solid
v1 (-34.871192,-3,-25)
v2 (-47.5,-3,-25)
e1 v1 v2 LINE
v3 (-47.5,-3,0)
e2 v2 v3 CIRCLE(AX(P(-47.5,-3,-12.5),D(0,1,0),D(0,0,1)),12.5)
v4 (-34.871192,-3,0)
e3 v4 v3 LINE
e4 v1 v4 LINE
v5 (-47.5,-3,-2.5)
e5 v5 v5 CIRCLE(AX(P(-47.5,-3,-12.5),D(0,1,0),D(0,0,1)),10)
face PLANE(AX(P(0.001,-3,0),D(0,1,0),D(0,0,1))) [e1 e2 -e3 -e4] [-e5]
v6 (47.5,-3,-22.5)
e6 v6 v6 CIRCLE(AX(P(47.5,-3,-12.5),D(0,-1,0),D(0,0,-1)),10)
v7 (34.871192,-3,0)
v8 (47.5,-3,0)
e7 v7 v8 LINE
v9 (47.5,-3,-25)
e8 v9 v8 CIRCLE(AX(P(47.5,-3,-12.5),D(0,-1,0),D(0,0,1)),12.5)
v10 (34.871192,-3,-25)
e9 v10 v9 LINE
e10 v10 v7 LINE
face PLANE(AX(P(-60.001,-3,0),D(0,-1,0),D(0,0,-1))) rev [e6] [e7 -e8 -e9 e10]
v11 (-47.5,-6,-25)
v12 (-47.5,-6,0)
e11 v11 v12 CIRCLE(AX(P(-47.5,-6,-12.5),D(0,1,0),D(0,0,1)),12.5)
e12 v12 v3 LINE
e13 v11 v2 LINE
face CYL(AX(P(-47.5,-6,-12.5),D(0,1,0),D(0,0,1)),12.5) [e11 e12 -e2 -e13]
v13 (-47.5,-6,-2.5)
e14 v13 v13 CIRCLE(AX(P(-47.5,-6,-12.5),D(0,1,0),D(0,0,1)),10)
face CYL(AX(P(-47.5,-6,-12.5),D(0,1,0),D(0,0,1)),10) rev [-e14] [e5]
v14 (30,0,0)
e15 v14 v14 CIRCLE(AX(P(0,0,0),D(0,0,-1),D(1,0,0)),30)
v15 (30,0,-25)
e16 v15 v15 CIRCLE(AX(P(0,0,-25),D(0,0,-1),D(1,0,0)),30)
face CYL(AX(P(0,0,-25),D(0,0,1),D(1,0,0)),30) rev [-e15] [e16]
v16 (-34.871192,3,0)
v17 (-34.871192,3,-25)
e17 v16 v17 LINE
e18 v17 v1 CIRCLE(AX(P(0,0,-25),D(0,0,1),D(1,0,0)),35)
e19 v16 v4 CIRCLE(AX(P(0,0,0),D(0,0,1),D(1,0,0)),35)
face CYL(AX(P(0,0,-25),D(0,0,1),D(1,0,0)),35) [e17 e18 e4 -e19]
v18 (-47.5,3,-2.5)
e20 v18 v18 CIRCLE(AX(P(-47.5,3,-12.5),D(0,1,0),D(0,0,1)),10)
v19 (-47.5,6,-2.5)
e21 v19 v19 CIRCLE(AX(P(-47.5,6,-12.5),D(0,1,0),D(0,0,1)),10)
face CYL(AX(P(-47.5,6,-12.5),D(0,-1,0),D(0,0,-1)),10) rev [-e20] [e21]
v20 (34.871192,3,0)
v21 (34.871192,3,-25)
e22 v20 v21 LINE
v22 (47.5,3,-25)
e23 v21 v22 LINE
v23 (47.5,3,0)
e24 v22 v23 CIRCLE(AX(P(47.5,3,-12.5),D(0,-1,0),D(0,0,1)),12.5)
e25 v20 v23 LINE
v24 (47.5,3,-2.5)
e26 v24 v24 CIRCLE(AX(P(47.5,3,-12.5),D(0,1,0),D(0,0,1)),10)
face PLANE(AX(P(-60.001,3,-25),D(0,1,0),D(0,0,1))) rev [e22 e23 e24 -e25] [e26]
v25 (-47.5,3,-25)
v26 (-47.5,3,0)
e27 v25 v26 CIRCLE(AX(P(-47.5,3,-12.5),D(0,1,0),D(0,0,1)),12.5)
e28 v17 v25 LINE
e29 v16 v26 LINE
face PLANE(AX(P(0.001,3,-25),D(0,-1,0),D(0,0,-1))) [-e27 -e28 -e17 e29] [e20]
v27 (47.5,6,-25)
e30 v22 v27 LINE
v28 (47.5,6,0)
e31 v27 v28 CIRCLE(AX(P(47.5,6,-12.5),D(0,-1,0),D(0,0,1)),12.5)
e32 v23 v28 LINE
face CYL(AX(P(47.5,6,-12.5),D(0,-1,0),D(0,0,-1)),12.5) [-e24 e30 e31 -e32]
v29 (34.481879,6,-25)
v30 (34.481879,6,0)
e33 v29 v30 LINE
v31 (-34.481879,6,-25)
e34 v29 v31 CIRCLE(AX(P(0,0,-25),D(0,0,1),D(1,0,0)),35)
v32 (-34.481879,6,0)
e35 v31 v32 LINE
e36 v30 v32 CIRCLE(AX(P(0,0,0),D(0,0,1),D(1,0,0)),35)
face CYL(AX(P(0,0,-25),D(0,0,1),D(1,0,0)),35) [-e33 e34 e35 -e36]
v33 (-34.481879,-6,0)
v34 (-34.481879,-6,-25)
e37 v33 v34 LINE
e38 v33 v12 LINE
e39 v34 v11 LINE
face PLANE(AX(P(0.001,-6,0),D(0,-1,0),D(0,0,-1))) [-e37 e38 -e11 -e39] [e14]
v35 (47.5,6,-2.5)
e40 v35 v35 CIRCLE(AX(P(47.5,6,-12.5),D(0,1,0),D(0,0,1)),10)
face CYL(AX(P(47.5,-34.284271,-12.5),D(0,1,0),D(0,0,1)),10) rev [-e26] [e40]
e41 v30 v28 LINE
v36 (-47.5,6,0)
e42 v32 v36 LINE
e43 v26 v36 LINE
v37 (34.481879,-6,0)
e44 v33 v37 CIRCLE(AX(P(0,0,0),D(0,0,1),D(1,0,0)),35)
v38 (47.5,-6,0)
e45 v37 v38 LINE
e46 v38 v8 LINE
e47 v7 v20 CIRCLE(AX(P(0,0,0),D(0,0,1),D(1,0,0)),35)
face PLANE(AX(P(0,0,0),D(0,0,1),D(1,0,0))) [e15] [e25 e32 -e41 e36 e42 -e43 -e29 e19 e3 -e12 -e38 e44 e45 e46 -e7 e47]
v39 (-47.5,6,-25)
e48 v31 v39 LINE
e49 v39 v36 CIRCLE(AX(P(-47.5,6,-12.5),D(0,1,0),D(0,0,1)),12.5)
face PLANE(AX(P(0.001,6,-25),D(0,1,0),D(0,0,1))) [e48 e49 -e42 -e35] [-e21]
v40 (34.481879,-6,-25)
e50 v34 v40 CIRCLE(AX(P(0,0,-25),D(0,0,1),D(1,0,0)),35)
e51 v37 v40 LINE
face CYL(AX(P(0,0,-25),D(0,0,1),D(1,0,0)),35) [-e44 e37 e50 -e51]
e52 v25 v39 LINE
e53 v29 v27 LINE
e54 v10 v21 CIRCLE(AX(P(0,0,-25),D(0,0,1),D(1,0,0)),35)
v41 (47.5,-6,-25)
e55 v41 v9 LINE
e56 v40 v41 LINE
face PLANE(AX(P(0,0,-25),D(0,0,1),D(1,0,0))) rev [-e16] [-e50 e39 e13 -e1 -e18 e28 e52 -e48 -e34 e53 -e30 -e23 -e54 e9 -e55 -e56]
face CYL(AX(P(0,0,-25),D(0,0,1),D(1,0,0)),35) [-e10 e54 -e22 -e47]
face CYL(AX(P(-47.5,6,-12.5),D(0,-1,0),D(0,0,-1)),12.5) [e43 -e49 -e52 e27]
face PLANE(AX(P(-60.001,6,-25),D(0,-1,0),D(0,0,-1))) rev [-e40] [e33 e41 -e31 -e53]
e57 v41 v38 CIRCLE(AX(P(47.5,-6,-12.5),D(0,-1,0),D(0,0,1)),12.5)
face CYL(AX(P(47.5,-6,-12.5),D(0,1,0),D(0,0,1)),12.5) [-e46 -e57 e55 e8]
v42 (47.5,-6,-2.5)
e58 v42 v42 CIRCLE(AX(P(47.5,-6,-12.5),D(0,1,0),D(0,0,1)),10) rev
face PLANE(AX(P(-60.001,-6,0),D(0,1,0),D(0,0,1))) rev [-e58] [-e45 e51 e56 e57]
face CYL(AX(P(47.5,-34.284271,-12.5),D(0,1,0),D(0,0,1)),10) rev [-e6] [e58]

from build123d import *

# Parameters (mm, degrees)
TUBE_EXTRUDE_DEPTH                                  = 25
UPPER_START                                         = 3
PIN_RING_SKETCH_R                                   = 12.5
PIN_RING_SKETCH_R_2                                 = 10
UPPER_RIGHT_PIN_RING_EXTRUDE_DEPTH                  = 3
LOWER_START                                         = -3
PIN_RING_SKETCH_2_R                                 = 12.5
PIN_RING_SKETCH_2_R_2                               = 10
LOWER_RIGHT_PIN_RING_EXTRUDE_DEPTH                  = 3
UPPER_RIGHT_RING_CONNECTION_EXTRUDE_REACH           = 57.453
UPPER_RIGHT_RING_CONNECTION_EXTRUDE_END_RADIUS      = 35
UPPER_RIGHT_RING_CONNECTION_SKETCH_W                = 25
UPPER_RIGHT_RING_CONNECTION_SKETCH_H                = 3
UPPER_RIGHT_RING_CONNECTION_EXTRUDE_DIRE_REACH      = 57.453
UPPER_RIGHT_RING_CONNECTION_EXTRUDE_DIRE_END_RADIUS = 12.5
LOWER_RIGHT_RING_CONNECTION_EXTRUDE_REACH           = 57.453
LOWER_RIGHT_RING_CONNECTION_EXTRUDE_END_RADIUS      = 35
LOWER_RIGHT_RING_CONNECTION_SKETCH_W                = 25
LOWER_RIGHT_RING_CONNECTION_SKETCH_H                = 3
LOWER_RIGHT_RING_CONNECTION_EXTRUDE_DIRE_REACH      = 57.453
LOWER_RIGHT_RING_CONNECTION_EXTRUDE_DIRE_END_RADIUS = 12.5
FAULTY_START                                        = -35
FAULTY_MIRROR_DEPTH                                 = 70
FAULTY_START_2                                      = -25
FAULTY_MIRROR_2_DEPTH                               = 25
MIRROR_HACK_CUT_REACH                               = 78.851
MIRROR_HACK_SKETCH_R                                = 10


with BuildPart() as part:
    # Tube Sketch → Tube Extrude (new body)
    with BuildSketch(Plane.XY):
        with BuildLine():
            Line((0, 35), (0, 30))
            ThreePointArc((0, 30), (-30, 0), (0, -30))
            Line((0, -30), (0, -35))
            ThreePointArc((0, -35), (-35, 0), (0, 35))
        make_face()
    extrude(amount=-TUBE_EXTRUDE_DEPTH)



with BuildPart() as body_2:
    # Pin Ring Sketch → Upper Right Pin Ring Extrude (new body)
    with BuildSketch(Plane(origin=(0, 0, 0), x_dir=(1, 0, 0), z_dir=(0, 1, 0)).offset(UPPER_START)):
        with Locations(Location((-47.5, 12.5, 0), (0, 0, 270))):
            Circle(PIN_RING_SKETCH_R)
        with Locations(Location((-47.5, 12.5, 0), (0, 0, 270))):
            Circle(PIN_RING_SKETCH_R_2, mode=Mode.SUBTRACT)
    extrude(amount=UPPER_RIGHT_PIN_RING_EXTRUDE_DEPTH)


with BuildPart() as body_3:
    # Pin Ring Sketch<2> → Lower Right Pin Ring Extrude (new body)
    with BuildSketch(Plane(origin=(0, 0, 0), x_dir=(1, 0, 0), z_dir=(0, 1, 0)).offset(LOWER_START)):
        with Locations(Location((-47.5, 12.5, 0), (0, 0, 270))):
            Circle(PIN_RING_SKETCH_2_R)
        with Locations(Location((-47.5, 12.5, 0), (0, 0, 270))):
            Circle(PIN_RING_SKETCH_2_R_2, mode=Mode.SUBTRACT)
    extrude(amount=-LOWER_RIGHT_PIN_RING_EXTRUDE_DEPTH)


with BuildPart() as part_1:
    add(part.part)

    add(body_2.part)  # Upper Right Ring Connection Extrude merges body 2
    # Upper Right Ring Connection Extrude: up to this cylinder (the profile starts outside it)
    upper_right_ring_connection_extrude_end = Plane(origin=(0, 0, -12.5), z_dir=(0, 0, 1)) * Cylinder(UPPER_RIGHT_RING_CONNECTION_EXTRUDE_END_RADIUS, 185.906, mode=Mode.PRIVATE)
    # Upper Right Ring Connection Sketch → Upper Right Ring Connection Extrude (add, up to the surface)
    with BuildSketch(Plane.ZY.offset(35), mode=Mode.PRIVATE) as upper_right_ring_connection_extrude_sk1:
        with Locations((-12.5, 4.5)):
            Rectangle(UPPER_RIGHT_RING_CONNECTION_SKETCH_W, UPPER_RIGHT_RING_CONNECTION_SKETCH_H)
    upper_right_ring_connection_extrude_tool1 = extrude(upper_right_ring_connection_extrude_sk1.sketch, amount=-UPPER_RIGHT_RING_CONNECTION_EXTRUDE_REACH, mode=Mode.PRIVATE) - upper_right_ring_connection_extrude_end
    add(upper_right_ring_connection_extrude_tool1.solids().sort_by_distance((-35, 4.5, -12.5))[0])

    # Upper Right Ring Connection Extrude dire: up to this cylinder (the profile starts outside it)
    upper_right_ring_connection_extrude_dire_end = Plane(origin=(-47.5, 4.5, -12.5), z_dir=(0, -1, 0)) * Cylinder(UPPER_RIGHT_RING_CONNECTION_EXTRUDE_DIRE_END_RADIUS, 140.906, mode=Mode.PRIVATE)
    # Upper Right Ring Connection Sketch → Upper Right Ring Connection Extrude dire (add, up to the surface)
    with BuildSketch(Plane.ZY.offset(35), mode=Mode.PRIVATE) as upper_right_ring_connection_extrude_dire_sk1:
        with Locations((-12.5, 4.5)):
            Rectangle(UPPER_RIGHT_RING_CONNECTION_SKETCH_W, UPPER_RIGHT_RING_CONNECTION_SKETCH_H)
    upper_right_ring_connection_extrude_dire_tool1 = extrude(upper_right_ring_connection_extrude_dire_sk1.sketch, amount=UPPER_RIGHT_RING_CONNECTION_EXTRUDE_DIRE_REACH, mode=Mode.PRIVATE) - upper_right_ring_connection_extrude_dire_end
    add(upper_right_ring_connection_extrude_dire_tool1.solids().sort_by_distance((-35, 4.5, -12.5))[0])
    add(upper_right_ring_connection_extrude_dire_tool1.solids().sort_by_distance((-35, 4.5, -12.5))[1])


    add(body_3.part)  # Lower Right Ring Connection Extrude merges body 3
    # Lower Right Ring Connection Extrude: up to this cylinder (the profile starts outside it)
    lower_right_ring_connection_extrude_end = Plane(origin=(0, 0, -12.5), z_dir=(0, 0, 1)) * Cylinder(LOWER_RIGHT_RING_CONNECTION_EXTRUDE_END_RADIUS, 185.906, mode=Mode.PRIVATE)
    # Lower Right Ring Connection Sketch → Lower Right Ring Connection Extrude (add, up to the surface)
    with BuildSketch(Plane.ZY.offset(35), mode=Mode.PRIVATE) as lower_right_ring_connection_extrude_sk1:
        with Locations((-12.5, -4.5)):
            Rectangle(LOWER_RIGHT_RING_CONNECTION_SKETCH_W, LOWER_RIGHT_RING_CONNECTION_SKETCH_H)
    lower_right_ring_connection_extrude_tool1 = extrude(lower_right_ring_connection_extrude_sk1.sketch, amount=-LOWER_RIGHT_RING_CONNECTION_EXTRUDE_REACH, mode=Mode.PRIVATE) - lower_right_ring_connection_extrude_end
    add(lower_right_ring_connection_extrude_tool1.solids().sort_by_distance((-35, -4.5, -12.5))[0])

    # Lower Right Ring Connection Extrude dire: up to this cylinder (the profile starts outside it)
    lower_right_ring_connection_extrude_dire_end = Plane(origin=(-47.5, -4.5, -12.5), z_dir=(0, 1, 0)) * Cylinder(LOWER_RIGHT_RING_CONNECTION_EXTRUDE_DIRE_END_RADIUS, 140.906, mode=Mode.PRIVATE)
    # Lower Right Ring Connection Sketch → Lower Right Ring Connection Extrude dire (add, up to the surface)
    with BuildSketch(Plane.ZY.offset(35), mode=Mode.PRIVATE) as lower_right_ring_connection_extrude_dire_sk1:
        with Locations((-12.5, -4.5)):
            Rectangle(LOWER_RIGHT_RING_CONNECTION_SKETCH_W, LOWER_RIGHT_RING_CONNECTION_SKETCH_H)
    lower_right_ring_connection_extrude_dire_tool1 = extrude(lower_right_ring_connection_extrude_dire_sk1.sketch, amount=LOWER_RIGHT_RING_CONNECTION_EXTRUDE_DIRE_REACH, mode=Mode.PRIVATE) - lower_right_ring_connection_extrude_dire_end
    add(lower_right_ring_connection_extrude_dire_tool1.solids().sort_by_distance((-35, -4.5, -12.5))[0])
    add(lower_right_ring_connection_extrude_dire_tool1.solids().sort_by_distance((-35, -4.5, -12.5))[1])

    # Faulty Mirror: read off the stored shape, not the designer's step
    # Faulty Mirror outline → Faulty Mirror (add)
    with BuildSketch(Plane(origin=(0, 0, 0), x_dir=(1, 0, 0), z_dir=(0, 1, 0)).offset(FAULTY_START)):
        with BuildLine():
            Line((47.5, 25), (0, 25))
            Line((0, 25), (0, 0))
            Line((0, 0), (47.5, 0))
            ThreePointArc((47.5, 0), (60, 12.5), (47.5, 25))
        make_face()
    extrude(amount=FAULTY_MIRROR_DEPTH)

    # Faulty Mirror 2 outline → Faulty Mirror 2 (cut)
    with BuildSketch(Plane.XY.offset(FAULTY_START_2)):
        with BuildLine():
            ThreePointArc((34.871191548, 3), (35, 0), (34.871191548, -3))
            Line((34.871191548, -3), (61, -3))
            Line((61, -3), (61, 3))
            Line((61, 3), (34.871191548, 3))
        make_face()
        with BuildLine():
            Line((61, -35), (61, -6))
            Line((61, -6), (34.481879299, -6))
            ThreePointArc((34.481879299, -6), (22.527760652, -26.786190472), (0, -35))
            Line((0, -35), (61, -35))
        make_face()
        with BuildLine():
            Line((34.481879299, 6), (61, 6))
            Line((61, 6), (61, 35))
            Line((61, 35), (0, 35))
            ThreePointArc((0, 35), (22.527760652, 26.786190472), (34.481879299, 6))
        make_face()
        with BuildLine():
            Line((0, 30), (0, -30))
            ThreePointArc((0, -30), (30, 0), (0, 30))
        make_face()
    extrude(amount=FAULTY_MIRROR_2_DEPTH, mode=Mode.SUBTRACT)

    # Mirror Hack Cut: up to this face of the body (flat: up to its plane)
    mirror_hack_cut_end = Plane(part_1.part.faces().sort_by_distance((46.070109689, -6, -12.5))[0])
    # Mirror Hack Sketch → Mirror Hack Cut (cut, up to the picked face)
    with BuildSketch(Plane(origin=(0, 6, 0), x_dir=(1, 0, 0), z_dir=(0, 1, 0)), mode=Mode.PRIVATE) as mirror_hack_cut_sk1:
        with Locations(Location((47.5, 12.5, 0), (0, 0, 270))):
            Circle(MIRROR_HACK_SKETCH_R)
    mirror_hack_cut_tool1 = split(extrude(mirror_hack_cut_sk1.sketch, amount=-MIRROR_HACK_CUT_REACH, mode=Mode.PRIVATE), bisect_by=mirror_hack_cut_end, keep=Keep.BOTH, mode=Mode.PRIVATE)
    add(mirror_hack_cut_tool1.solids().sort_by(Axis((47.5, 6, -12.5), (0, -1, 0)))[0], mode=Mode.SUBTRACT)


solid = part_1.part
